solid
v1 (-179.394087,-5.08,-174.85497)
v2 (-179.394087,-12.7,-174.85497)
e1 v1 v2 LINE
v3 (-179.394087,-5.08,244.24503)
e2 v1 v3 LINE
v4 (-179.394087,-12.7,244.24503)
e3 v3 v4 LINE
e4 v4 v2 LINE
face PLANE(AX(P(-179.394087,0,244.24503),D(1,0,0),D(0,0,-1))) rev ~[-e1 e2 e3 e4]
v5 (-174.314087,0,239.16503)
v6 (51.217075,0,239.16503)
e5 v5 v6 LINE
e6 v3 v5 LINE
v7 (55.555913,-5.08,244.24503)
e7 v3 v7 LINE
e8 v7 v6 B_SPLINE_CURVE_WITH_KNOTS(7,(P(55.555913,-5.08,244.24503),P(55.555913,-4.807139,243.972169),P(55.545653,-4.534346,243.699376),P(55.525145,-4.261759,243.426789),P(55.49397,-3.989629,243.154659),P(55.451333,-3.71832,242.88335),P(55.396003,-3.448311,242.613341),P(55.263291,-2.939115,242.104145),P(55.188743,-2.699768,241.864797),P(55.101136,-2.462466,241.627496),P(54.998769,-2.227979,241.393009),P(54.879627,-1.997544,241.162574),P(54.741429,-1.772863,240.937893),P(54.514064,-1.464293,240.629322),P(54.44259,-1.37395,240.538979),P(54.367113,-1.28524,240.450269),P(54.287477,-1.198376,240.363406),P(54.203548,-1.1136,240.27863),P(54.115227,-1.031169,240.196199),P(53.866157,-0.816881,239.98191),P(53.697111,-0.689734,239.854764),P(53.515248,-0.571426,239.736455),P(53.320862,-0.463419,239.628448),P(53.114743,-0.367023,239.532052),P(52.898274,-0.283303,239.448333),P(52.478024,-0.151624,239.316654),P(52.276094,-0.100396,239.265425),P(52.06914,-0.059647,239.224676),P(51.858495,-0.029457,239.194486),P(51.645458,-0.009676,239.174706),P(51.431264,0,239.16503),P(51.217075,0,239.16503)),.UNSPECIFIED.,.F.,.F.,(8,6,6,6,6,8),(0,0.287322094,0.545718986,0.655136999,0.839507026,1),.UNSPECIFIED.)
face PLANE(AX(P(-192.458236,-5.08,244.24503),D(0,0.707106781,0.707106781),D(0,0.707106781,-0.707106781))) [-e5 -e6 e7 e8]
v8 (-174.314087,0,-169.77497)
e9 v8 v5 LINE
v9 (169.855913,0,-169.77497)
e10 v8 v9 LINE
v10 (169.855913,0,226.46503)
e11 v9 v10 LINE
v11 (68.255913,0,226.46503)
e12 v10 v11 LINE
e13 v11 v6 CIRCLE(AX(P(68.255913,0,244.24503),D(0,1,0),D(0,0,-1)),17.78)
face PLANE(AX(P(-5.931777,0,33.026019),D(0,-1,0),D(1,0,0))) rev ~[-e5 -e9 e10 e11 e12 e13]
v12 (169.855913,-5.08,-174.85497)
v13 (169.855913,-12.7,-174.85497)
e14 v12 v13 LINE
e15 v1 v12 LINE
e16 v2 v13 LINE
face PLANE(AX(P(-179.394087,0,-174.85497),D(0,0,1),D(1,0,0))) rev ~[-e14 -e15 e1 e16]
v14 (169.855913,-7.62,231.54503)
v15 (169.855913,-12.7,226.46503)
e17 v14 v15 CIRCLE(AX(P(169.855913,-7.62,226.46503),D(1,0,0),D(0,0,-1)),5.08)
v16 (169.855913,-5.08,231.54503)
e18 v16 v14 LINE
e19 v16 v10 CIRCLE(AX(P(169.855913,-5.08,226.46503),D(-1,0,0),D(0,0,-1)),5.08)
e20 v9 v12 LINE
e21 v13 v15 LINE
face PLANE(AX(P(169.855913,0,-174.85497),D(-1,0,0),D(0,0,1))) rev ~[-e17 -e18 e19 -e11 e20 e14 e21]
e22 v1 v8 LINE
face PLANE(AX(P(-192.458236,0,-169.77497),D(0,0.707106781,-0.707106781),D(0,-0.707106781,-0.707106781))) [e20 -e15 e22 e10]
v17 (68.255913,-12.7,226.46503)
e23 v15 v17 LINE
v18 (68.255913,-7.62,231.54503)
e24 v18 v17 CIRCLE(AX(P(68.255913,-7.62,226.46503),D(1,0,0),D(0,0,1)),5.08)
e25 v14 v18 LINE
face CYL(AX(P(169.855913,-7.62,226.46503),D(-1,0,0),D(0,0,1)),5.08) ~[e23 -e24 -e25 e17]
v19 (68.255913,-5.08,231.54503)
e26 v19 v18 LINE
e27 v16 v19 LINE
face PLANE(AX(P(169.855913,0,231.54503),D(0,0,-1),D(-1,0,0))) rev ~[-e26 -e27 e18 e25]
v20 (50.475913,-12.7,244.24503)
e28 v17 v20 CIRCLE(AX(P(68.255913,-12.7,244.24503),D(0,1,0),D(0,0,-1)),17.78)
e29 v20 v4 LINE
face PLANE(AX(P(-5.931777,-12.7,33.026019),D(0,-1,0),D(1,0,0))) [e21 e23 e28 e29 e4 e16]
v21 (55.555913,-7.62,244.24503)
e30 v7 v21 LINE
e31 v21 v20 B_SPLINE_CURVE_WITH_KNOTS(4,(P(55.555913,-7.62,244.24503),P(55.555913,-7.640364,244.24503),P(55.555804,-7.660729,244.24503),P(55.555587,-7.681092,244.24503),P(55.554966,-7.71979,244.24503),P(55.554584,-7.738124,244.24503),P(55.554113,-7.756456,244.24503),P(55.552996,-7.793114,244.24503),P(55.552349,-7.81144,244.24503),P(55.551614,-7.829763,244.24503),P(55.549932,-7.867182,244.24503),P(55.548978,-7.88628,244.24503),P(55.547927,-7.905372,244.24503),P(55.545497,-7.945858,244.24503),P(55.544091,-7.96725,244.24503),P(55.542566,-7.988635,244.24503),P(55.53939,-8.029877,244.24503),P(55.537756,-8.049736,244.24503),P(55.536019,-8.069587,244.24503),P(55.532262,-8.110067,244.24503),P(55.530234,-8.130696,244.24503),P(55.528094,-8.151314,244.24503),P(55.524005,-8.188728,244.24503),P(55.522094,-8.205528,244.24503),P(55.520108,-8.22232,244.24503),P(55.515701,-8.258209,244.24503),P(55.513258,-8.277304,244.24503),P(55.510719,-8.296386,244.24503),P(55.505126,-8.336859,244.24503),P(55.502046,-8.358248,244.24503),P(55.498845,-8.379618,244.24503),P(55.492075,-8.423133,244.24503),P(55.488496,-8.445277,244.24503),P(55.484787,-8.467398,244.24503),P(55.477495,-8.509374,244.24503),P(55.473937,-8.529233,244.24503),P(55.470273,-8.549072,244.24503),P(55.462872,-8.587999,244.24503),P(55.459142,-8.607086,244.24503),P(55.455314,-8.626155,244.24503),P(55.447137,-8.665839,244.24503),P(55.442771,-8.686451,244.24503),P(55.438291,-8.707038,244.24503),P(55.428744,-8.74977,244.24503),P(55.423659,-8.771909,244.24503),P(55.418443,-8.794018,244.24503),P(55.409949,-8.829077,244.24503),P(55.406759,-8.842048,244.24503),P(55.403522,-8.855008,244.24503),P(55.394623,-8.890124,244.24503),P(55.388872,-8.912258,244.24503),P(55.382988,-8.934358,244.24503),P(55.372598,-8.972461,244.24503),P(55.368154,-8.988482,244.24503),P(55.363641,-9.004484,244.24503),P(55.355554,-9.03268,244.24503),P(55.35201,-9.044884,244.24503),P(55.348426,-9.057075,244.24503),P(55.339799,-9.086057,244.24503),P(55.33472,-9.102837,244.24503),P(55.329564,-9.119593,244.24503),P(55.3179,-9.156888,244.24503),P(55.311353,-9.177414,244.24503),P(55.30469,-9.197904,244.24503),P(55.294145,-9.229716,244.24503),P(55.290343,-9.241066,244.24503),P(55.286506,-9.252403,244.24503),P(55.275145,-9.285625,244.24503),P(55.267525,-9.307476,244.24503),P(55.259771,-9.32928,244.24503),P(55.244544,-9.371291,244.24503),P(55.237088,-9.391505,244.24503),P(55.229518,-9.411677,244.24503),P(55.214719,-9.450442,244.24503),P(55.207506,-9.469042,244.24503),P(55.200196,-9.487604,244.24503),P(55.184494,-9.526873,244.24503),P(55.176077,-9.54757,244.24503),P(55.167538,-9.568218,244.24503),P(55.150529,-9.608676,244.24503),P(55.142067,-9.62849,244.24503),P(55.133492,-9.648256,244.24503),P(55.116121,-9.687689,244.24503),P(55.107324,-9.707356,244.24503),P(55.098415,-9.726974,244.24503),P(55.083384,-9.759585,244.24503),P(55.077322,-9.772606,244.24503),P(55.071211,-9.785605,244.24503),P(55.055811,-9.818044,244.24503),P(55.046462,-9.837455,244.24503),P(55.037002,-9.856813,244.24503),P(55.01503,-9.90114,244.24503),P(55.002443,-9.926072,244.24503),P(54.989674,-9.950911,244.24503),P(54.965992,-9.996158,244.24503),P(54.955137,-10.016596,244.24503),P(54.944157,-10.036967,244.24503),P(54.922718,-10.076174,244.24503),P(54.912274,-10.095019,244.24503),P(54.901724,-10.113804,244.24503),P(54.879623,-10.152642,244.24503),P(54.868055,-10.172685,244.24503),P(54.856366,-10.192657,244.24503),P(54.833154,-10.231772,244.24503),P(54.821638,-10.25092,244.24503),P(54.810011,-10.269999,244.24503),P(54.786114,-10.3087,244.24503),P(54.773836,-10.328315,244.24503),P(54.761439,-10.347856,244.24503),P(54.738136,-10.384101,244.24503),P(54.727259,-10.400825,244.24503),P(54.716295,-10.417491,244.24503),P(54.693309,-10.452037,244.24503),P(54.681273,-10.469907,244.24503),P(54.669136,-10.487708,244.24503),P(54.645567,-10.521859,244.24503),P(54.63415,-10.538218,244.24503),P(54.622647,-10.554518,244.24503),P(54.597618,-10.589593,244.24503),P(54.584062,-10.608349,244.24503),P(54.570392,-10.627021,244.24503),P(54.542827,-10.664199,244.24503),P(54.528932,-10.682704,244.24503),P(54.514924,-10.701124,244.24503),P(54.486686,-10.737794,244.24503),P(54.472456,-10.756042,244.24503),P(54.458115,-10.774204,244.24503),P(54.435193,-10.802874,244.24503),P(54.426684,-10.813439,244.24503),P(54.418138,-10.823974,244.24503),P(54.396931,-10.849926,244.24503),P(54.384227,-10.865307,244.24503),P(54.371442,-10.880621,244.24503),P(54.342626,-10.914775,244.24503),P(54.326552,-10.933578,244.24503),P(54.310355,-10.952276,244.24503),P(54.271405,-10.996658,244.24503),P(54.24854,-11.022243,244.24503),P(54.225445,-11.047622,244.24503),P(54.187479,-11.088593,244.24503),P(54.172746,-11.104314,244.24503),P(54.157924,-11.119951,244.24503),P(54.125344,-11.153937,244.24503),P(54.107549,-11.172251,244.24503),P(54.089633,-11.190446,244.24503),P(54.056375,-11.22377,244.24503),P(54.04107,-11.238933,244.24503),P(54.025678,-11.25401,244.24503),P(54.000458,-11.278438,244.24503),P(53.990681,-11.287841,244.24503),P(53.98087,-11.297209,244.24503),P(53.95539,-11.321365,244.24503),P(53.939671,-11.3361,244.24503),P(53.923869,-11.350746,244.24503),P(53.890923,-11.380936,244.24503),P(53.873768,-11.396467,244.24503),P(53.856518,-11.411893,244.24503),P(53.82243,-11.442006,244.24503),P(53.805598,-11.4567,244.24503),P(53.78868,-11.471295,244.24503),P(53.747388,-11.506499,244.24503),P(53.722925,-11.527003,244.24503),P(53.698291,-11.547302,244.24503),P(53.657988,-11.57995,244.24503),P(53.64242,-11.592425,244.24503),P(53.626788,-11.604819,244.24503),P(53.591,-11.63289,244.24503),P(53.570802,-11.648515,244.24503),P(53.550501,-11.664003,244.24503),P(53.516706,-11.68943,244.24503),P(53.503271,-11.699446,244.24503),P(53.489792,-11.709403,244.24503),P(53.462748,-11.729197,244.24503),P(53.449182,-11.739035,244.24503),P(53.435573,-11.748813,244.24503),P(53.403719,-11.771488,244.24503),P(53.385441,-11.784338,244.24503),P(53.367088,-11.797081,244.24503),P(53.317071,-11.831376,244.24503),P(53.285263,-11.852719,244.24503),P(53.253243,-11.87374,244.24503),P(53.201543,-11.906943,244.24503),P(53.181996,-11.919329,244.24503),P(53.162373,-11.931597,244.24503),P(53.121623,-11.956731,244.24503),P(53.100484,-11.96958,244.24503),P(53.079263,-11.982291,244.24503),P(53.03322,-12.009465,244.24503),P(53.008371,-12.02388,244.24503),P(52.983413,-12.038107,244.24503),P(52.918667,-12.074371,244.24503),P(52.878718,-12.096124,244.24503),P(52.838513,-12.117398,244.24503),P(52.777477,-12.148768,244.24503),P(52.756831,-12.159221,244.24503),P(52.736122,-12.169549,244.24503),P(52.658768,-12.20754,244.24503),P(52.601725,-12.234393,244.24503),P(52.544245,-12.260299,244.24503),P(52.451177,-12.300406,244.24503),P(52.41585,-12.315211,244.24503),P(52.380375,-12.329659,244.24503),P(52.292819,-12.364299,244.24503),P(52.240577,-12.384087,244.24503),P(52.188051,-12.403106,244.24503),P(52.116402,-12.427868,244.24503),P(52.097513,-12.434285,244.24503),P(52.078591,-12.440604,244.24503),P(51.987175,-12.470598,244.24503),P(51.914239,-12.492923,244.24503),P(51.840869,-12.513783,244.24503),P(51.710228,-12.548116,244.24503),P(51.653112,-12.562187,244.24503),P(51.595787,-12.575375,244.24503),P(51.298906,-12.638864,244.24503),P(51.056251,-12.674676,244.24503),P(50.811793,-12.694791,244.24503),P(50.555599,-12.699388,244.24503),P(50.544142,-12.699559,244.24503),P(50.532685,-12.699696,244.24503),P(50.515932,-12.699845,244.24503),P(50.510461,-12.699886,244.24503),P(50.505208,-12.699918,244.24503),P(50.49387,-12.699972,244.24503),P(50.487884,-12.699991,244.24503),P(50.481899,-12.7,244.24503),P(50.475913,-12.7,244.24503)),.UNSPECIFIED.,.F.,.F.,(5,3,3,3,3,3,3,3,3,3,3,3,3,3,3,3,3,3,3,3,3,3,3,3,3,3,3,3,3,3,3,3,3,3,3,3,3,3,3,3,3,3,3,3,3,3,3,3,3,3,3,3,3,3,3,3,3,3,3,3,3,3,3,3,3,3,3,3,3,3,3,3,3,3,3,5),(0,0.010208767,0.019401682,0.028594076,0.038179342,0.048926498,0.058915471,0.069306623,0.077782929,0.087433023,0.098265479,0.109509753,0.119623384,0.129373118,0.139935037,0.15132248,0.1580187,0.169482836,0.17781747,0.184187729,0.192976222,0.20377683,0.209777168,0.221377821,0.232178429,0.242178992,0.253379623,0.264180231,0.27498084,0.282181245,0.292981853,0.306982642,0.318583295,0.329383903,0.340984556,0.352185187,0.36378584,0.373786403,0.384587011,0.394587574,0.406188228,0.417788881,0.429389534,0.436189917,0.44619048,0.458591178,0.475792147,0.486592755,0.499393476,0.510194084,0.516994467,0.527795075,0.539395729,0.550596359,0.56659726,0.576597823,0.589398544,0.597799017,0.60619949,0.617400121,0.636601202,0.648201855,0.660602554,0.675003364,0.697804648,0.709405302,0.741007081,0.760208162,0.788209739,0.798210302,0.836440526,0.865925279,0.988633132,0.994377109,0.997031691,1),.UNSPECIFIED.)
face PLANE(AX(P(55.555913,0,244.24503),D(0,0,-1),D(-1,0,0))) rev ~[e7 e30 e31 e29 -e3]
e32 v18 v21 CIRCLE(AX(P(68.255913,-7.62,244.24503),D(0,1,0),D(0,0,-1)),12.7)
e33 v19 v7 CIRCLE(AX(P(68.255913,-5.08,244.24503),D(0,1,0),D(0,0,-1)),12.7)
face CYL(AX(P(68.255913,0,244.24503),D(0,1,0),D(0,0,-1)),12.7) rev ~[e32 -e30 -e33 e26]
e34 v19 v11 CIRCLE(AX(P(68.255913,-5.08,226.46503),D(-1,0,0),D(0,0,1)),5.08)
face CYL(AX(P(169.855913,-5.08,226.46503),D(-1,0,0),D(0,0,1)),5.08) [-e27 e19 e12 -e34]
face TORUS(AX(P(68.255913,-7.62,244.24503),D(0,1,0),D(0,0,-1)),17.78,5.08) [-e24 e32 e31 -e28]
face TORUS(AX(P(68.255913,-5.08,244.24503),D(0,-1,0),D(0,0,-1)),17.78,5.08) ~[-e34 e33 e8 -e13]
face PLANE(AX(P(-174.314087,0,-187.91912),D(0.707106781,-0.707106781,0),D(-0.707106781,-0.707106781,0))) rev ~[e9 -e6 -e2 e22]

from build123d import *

# Parameters (mm, degrees)
F1_DEPTH    = 12.7
F2_R        = 5.08
F3_T1_DEPTH = 255.9982991577
F3_T3_DEPTH = 445.2282991577
F3_T5_DEPTH = 375.3782991577


# Not quite as in the source:
# - a fillet or chamfer that OpenCascade refuses, or shapes differently, is made with other operations: its cross-section is extruded or revolved along the edge and cut away or added


with BuildPart() as f1:
    # F0 (on Front) → F1 (new body)
    with BuildSketch(Plane.XZ):
        with BuildLine():
            Line((55.5559131622, 244.2450298561), (-179.3940868378, 244.2450298561))
            Line((-179.3940868378, 244.2450298561), (-179.3940868378, -174.8549701439))
            Line((-179.3940868378, -174.8549701439), (169.8559131622, -174.8549701439))
            Line((169.8559131622, -174.8549701439), (169.8559131622, 231.5450298561))
            Line((169.8559131622, 231.5450298561), (68.2559131622, 231.5450298561))
            ThreePointArc((68.2559131622, 231.5450298561), (59.2756570412, 235.264773735), (55.5559131622, 244.2450298561))
        make_face()
    extrude(amount=F1_DEPTH)

    # F2
    f2_edges = [f1.edges().sort_by_distance(p)[0] for p in [
        (119.055913, 0, 231.54503),
        (119.055913, -12.7, 231.54503),
        (59.275657, 0, 235.264774),
        (59.275657, -12.7, 235.264774),
    ]]
    fillet(f2_edges, radius=F2_R)

    # F3: chamfer of 5.08 on 3 edges, made by hand

    # F3_s2 → F3_t1 (cut)
    with BuildSketch(Plane.YZ.offset(-192.4582364166)):
        Polygon((-5.08, 244.2450298561), (0, 239.1650298561), (0, 244.2450298561), align=None)
    extrude(amount=F3_T1_DEPTH, mode=Mode.SUBTRACT)

    # F3_s4 → F3_t3 (cut)
    with BuildSketch(Plane.XY.offset(-187.9191197228)):
        Polygon((-174.3140868378, 0), (-179.3940868378, -5.08), (-179.3940868378, 0), align=None)
    extrude(amount=F3_T3_DEPTH, mode=Mode.SUBTRACT)

    # F3_s6 → F3_t5 (cut)
    with BuildSketch(Plane.YZ.offset(-192.4582364166)):
        Polygon((0, -169.7749701439), (-5.08, -174.8549701439), (0, -174.8549701439), align=None)
    extrude(amount=F3_T5_DEPTH, mode=Mode.SUBTRACT)


solid = f1.part
